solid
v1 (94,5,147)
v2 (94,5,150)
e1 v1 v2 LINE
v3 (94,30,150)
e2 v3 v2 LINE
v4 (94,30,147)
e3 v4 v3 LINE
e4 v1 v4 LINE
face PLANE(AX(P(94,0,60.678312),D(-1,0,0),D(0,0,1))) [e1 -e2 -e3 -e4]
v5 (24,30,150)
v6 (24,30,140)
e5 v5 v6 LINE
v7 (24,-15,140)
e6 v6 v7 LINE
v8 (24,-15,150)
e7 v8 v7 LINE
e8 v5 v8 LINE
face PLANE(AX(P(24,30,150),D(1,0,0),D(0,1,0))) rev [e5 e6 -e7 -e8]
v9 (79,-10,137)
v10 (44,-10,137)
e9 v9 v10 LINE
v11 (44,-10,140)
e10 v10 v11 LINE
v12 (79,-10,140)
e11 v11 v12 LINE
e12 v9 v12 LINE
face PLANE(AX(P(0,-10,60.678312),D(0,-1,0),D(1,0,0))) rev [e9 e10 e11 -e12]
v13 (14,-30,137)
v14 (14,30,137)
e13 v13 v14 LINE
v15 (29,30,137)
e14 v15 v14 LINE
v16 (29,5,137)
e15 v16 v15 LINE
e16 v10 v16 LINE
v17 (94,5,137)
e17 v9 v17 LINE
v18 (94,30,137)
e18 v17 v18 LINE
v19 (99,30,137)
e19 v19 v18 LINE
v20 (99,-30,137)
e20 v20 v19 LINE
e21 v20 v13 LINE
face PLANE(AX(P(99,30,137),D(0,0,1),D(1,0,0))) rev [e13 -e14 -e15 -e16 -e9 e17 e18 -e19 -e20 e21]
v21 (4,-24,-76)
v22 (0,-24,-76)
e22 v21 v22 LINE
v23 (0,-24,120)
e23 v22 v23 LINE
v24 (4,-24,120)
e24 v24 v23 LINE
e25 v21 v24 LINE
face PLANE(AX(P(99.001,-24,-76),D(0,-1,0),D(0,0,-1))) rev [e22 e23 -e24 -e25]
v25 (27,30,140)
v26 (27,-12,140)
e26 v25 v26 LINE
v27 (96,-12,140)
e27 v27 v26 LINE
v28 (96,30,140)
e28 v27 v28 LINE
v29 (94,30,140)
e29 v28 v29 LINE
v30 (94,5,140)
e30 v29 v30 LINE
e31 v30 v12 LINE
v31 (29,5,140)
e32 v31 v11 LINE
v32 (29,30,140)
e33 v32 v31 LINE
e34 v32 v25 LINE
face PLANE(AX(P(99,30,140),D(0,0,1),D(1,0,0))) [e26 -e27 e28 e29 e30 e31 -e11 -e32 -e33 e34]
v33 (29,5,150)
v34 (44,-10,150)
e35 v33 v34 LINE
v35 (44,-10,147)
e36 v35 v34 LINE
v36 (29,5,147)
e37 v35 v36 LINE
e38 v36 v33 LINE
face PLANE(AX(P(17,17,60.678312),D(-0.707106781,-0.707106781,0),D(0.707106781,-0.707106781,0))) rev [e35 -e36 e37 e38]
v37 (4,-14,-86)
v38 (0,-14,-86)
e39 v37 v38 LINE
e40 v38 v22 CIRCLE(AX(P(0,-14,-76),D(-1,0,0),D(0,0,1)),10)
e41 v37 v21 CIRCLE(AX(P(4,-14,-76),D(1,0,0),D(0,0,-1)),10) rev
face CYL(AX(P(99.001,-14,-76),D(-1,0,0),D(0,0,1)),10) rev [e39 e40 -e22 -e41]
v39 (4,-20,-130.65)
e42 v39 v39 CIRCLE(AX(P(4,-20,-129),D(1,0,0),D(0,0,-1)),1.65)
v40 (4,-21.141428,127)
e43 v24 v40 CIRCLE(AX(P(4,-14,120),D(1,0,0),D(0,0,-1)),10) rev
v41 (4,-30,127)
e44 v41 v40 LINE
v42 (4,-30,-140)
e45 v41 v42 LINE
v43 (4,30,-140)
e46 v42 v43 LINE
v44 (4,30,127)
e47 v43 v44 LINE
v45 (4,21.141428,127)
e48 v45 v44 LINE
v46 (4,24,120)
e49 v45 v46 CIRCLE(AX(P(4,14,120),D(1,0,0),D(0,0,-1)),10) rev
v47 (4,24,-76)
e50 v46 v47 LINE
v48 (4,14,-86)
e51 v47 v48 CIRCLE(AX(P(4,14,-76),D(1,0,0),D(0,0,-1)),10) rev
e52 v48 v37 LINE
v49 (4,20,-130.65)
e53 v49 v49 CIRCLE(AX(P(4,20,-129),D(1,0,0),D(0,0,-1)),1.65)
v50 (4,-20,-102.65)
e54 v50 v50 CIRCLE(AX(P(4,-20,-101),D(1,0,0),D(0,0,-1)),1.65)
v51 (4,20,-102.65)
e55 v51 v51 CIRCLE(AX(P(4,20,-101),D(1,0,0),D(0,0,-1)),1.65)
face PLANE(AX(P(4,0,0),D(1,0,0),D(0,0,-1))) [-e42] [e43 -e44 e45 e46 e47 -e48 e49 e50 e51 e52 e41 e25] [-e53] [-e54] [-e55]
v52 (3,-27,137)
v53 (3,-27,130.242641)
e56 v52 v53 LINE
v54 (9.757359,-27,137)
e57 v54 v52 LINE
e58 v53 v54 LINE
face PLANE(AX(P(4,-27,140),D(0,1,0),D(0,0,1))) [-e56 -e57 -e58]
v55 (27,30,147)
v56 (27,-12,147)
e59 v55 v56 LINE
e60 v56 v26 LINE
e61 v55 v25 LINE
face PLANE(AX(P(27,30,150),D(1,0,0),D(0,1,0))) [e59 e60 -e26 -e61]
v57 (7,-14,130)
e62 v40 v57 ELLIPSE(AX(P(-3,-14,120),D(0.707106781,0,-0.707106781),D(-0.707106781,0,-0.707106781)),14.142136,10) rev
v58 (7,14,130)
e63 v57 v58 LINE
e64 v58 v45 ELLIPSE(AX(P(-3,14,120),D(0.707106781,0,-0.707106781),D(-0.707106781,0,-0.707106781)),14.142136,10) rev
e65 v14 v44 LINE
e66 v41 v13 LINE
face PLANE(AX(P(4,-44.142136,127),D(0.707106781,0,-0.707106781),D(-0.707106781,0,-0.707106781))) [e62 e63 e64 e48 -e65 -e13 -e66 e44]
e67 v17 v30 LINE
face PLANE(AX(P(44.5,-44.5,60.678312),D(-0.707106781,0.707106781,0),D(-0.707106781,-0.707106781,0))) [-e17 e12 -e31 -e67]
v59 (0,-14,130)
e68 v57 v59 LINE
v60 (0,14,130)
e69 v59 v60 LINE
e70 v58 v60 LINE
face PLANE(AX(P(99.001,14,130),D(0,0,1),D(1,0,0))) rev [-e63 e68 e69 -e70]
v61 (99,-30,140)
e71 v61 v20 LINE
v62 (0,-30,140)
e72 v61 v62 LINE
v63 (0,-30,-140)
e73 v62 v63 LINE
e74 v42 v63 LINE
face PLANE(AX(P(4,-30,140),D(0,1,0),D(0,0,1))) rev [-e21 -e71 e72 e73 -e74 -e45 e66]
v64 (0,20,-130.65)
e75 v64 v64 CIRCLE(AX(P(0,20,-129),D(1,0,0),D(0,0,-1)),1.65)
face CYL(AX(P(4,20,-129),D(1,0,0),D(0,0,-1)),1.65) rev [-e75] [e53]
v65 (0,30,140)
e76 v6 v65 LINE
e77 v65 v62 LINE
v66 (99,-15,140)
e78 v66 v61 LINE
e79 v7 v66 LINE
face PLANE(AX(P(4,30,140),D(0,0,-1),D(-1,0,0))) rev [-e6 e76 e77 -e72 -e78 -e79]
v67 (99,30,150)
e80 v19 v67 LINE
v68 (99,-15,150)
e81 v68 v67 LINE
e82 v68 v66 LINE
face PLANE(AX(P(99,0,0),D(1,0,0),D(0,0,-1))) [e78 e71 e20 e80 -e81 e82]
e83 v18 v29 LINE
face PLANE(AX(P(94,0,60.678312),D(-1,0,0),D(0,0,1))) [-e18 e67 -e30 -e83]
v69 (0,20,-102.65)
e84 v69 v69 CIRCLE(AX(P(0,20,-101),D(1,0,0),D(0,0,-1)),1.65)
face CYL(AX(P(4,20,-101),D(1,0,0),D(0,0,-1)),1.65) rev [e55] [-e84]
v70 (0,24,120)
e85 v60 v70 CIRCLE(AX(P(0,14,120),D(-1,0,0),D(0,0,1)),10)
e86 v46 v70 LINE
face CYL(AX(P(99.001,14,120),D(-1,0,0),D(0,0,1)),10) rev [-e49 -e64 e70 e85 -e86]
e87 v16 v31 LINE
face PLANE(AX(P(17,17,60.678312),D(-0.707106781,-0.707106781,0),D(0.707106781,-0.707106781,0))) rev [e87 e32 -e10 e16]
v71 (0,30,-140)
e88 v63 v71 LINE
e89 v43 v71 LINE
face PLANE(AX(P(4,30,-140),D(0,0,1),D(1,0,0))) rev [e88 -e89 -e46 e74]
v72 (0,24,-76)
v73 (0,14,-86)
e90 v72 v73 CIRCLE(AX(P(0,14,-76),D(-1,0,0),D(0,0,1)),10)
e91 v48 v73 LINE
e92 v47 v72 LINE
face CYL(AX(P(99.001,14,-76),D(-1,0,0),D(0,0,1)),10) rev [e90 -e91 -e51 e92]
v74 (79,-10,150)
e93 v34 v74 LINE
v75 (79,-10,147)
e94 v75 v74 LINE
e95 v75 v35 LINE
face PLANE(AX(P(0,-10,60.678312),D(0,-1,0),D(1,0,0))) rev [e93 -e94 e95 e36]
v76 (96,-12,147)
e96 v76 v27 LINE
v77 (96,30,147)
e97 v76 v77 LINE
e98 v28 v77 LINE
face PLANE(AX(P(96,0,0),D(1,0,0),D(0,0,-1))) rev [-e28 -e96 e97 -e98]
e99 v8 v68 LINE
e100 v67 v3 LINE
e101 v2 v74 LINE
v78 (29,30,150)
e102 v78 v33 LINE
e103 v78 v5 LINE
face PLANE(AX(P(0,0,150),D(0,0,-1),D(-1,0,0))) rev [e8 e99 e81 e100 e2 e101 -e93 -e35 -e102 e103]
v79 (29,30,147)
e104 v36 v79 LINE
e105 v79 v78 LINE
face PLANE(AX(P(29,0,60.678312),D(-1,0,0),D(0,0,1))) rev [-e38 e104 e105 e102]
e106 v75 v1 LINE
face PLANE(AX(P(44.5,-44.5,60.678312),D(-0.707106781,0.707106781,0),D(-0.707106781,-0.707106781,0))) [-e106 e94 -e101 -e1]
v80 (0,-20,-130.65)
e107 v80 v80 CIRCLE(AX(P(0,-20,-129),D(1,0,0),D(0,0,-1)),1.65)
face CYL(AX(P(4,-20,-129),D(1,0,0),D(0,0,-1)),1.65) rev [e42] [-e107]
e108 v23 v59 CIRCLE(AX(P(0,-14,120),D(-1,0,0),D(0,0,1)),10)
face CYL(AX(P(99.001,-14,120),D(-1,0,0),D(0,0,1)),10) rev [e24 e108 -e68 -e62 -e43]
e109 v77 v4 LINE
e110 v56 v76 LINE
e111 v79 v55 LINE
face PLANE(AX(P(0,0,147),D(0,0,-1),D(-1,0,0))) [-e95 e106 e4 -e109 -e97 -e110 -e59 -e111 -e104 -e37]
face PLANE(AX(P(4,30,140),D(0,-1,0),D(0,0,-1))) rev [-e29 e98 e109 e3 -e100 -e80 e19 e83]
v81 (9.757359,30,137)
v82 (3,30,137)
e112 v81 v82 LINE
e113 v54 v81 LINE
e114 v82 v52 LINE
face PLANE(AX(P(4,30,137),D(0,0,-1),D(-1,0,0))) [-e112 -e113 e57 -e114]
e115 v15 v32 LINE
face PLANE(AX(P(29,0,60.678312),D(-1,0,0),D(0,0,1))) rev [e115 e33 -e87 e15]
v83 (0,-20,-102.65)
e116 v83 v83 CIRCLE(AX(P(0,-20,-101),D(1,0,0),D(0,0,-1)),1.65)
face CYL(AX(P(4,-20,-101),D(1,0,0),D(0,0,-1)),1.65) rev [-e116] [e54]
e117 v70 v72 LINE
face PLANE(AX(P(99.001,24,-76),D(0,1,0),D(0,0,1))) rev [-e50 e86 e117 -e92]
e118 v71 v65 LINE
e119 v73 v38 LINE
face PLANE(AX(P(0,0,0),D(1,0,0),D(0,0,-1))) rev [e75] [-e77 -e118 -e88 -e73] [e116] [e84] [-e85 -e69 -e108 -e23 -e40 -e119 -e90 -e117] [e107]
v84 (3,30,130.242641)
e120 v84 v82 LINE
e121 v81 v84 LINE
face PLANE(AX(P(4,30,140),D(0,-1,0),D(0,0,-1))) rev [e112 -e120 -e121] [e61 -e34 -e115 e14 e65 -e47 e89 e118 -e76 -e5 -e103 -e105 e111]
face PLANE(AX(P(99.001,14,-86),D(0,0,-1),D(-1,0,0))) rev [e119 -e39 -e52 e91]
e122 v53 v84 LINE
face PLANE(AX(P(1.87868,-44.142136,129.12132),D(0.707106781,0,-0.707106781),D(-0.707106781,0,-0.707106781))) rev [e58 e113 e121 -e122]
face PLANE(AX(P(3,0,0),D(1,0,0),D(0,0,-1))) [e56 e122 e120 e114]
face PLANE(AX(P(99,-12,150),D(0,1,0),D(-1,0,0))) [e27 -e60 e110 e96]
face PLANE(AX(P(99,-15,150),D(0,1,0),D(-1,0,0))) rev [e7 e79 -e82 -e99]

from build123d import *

# Parameters (mm, degrees)
SKETCH_1_W          = 280
SKETCH_1_H          = 60
EXTRUDE_1_DEPTH     = 4
HOLE_WIZARD_M4_1_D  = 3.3
SKETCH_10_W         = 3
SKETCH_10_H         = 60
EXTRUDE_4_DEPTH     = 95
EXTRUDE_8_DEPTH     = 60
SKETCH_14_W         = 75
SKETCH_14_H         = 45
EXTRUDE_10_DEPTH    = 10
SHELL_START         = -12
SHELL_1_OUTLINE_W   = 69
SHELL_1_OUTLINE_H   = 7
SHELL_1_DEPTH       = 42
SHELL_START_2       = -27
SHELL_1_2_DEPTH     = 15
CUT_EXTRUDE_2_REACH = 309.898
CUT_EXTRUDE_3_REACH = 184.211


# Read off the part's stored shape, not the designer's step: 抽壳1
with BuildPart() as part:
    # 草图1 → 凸台-拉伸1 (new body)
    with BuildSketch(Plane(origin=(0, 0, 0), x_dir=(0, 0, -1), z_dir=(1, 0, 0))):
        Rectangle(SKETCH_1_W, SKETCH_1_H)
    extrude(amount=EXTRUDE_1_DEPTH)

    # M4 螺纹孔1 (through all)
    with Locations(Plane(origin=(4, 20, -129), x_dir=(0, 0, 1), z_dir=(1, 0, 0))):
        with Locations((0, 0), (28, 0), (28, 40), (0, 40)):
            Hole(HOLE_WIZARD_M4_1_D / 2)

    # 草图10 → 凸台-拉伸4 (add)
    with BuildSketch(Plane(origin=(4, 0, 0), x_dir=(0, 0, -1), z_dir=(1, 0, 0))):
        with Locations((-138.5, 0)):
            Rectangle(SKETCH_10_W, SKETCH_10_H)
    extrude(amount=EXTRUDE_4_DEPTH)

    # 草图11 → 凸台-拉伸8 (add)
    with BuildSketch(Plane(origin=(0, 30, 0), x_dir=(1, 0, 0), z_dir=(0, 1, 0))):
        Polygon((4, -127), (14, -137), (4, -137), align=None)
    extrude(amount=-EXTRUDE_8_DEPTH)

    # 草图14 → 凸台-拉伸10 (add)
    with BuildSketch(Plane.XY.offset(140)):
        with Locations((61.5, 7.5)):
            Rectangle(SKETCH_14_W, SKETCH_14_H)
    extrude(amount=EXTRUDE_10_DEPTH)

    # 抽壳1 outline → 抽壳1 (cut)
    with BuildSketch(Plane(origin=(0, 0, 0), x_dir=(1, 0, 0), z_dir=(0, 1, 0)).offset(SHELL_START)):
        with Locations((61.5, -143.5)):
            Rectangle(SHELL_1_OUTLINE_W, SHELL_1_OUTLINE_H)
        Polygon((3, -137), (9.757359313, -137), (3, -130.242640687), align=None)
    extrude(amount=SHELL_1_DEPTH, mode=Mode.SUBTRACT)

    # Shell 1 2 outline → Shell 1 2 (cut)
    with BuildSketch(Plane(origin=(0, 0, 0), x_dir=(1, 0, 0), z_dir=(0, 1, 0)).offset(SHELL_START_2)):
        Polygon((3, -137), (9.757359313, -137), (3, -130.242640687), align=None)
    extrude(amount=SHELL_1_2_DEPTH, mode=Mode.SUBTRACT)

    # 切除-拉伸2: up to this face of the body (flat: up to its plane)
    cut_extrude_2_end = Plane(part.part.faces().sort_by_distance((56.5, 0, 137))[0])
    # 草图15 → 切除-拉伸2 (cut, up to the picked face)
    with BuildSketch(Plane.XY.offset(150), mode=Mode.PRIVATE) as cut_extrude_2_sk1:
        Polygon((61.5, 30), (29, 30), (29, 5), (44, -10), (61.5, -10), align=None)
    cut_extrude_2_tool1 = split(extrude(cut_extrude_2_sk1.sketch, amount=-CUT_EXTRUDE_2_REACH, mode=Mode.PRIVATE), bisect_by=cut_extrude_2_end, keep=Keep.BOTH, mode=Mode.PRIVATE)
    # 草图15 → 切除-拉伸2 (cut, up to the picked face)
    with BuildSketch(Plane.XY.offset(150), mode=Mode.PRIVATE) as cut_extrude_2_sk2:
        Polygon((94, 30), (61.5, 30), (61.5, -10), (79, -10), (94, 5), align=None)
    cut_extrude_2_tool2 = split(extrude(cut_extrude_2_sk2.sketch, amount=-CUT_EXTRUDE_2_REACH, mode=Mode.PRIVATE), bisect_by=cut_extrude_2_end, keep=Keep.BOTH, mode=Mode.PRIVATE)
    add(cut_extrude_2_tool1.solids().sort_by(Axis((46.315789, 11.421053, 150), (0, 0, -1)))[0], mode=Mode.SUBTRACT)
    add(cut_extrude_2_tool2.solids().sort_by(Axis((76.684211, 11.421053, 150), (0, 0, -1)))[0], mode=Mode.SUBTRACT)

    # 草图16 → 切除-拉伸3 (cut, up to next)
    with BuildSketch(Plane.ZY, mode=Mode.PRIVATE) as cut_extrude_3_sk1:
        with BuildLine():
            Line((-76, 24), (120, 24))
            ThreePointArc((120, 24), (127.071067812, 21.071067812), (130, 14))
            Line((130, 14), (130, -14))
            ThreePointArc((130, -14), (127.071067812, -21.071067812), (120, -24))
            Line((120, -24), (-76, -24))
            ThreePointArc((-76, -24), (-83.071067812, -21.071067812), (-86, -14))
            Line((-86, -14), (-86, 14))
            ThreePointArc((-86, 14), (-83.071067812, 21.071067812), (-76, 24))
        make_face()
    cut_extrude_3_tool1 = extrude(cut_extrude_3_sk1.sketch, amount=-CUT_EXTRUDE_3_REACH, mode=Mode.PRIVATE) & part.part
    add(cut_extrude_3_tool1.solids().sort_by_distance((0, 0, 22))[0], mode=Mode.SUBTRACT)


solid = part.part
